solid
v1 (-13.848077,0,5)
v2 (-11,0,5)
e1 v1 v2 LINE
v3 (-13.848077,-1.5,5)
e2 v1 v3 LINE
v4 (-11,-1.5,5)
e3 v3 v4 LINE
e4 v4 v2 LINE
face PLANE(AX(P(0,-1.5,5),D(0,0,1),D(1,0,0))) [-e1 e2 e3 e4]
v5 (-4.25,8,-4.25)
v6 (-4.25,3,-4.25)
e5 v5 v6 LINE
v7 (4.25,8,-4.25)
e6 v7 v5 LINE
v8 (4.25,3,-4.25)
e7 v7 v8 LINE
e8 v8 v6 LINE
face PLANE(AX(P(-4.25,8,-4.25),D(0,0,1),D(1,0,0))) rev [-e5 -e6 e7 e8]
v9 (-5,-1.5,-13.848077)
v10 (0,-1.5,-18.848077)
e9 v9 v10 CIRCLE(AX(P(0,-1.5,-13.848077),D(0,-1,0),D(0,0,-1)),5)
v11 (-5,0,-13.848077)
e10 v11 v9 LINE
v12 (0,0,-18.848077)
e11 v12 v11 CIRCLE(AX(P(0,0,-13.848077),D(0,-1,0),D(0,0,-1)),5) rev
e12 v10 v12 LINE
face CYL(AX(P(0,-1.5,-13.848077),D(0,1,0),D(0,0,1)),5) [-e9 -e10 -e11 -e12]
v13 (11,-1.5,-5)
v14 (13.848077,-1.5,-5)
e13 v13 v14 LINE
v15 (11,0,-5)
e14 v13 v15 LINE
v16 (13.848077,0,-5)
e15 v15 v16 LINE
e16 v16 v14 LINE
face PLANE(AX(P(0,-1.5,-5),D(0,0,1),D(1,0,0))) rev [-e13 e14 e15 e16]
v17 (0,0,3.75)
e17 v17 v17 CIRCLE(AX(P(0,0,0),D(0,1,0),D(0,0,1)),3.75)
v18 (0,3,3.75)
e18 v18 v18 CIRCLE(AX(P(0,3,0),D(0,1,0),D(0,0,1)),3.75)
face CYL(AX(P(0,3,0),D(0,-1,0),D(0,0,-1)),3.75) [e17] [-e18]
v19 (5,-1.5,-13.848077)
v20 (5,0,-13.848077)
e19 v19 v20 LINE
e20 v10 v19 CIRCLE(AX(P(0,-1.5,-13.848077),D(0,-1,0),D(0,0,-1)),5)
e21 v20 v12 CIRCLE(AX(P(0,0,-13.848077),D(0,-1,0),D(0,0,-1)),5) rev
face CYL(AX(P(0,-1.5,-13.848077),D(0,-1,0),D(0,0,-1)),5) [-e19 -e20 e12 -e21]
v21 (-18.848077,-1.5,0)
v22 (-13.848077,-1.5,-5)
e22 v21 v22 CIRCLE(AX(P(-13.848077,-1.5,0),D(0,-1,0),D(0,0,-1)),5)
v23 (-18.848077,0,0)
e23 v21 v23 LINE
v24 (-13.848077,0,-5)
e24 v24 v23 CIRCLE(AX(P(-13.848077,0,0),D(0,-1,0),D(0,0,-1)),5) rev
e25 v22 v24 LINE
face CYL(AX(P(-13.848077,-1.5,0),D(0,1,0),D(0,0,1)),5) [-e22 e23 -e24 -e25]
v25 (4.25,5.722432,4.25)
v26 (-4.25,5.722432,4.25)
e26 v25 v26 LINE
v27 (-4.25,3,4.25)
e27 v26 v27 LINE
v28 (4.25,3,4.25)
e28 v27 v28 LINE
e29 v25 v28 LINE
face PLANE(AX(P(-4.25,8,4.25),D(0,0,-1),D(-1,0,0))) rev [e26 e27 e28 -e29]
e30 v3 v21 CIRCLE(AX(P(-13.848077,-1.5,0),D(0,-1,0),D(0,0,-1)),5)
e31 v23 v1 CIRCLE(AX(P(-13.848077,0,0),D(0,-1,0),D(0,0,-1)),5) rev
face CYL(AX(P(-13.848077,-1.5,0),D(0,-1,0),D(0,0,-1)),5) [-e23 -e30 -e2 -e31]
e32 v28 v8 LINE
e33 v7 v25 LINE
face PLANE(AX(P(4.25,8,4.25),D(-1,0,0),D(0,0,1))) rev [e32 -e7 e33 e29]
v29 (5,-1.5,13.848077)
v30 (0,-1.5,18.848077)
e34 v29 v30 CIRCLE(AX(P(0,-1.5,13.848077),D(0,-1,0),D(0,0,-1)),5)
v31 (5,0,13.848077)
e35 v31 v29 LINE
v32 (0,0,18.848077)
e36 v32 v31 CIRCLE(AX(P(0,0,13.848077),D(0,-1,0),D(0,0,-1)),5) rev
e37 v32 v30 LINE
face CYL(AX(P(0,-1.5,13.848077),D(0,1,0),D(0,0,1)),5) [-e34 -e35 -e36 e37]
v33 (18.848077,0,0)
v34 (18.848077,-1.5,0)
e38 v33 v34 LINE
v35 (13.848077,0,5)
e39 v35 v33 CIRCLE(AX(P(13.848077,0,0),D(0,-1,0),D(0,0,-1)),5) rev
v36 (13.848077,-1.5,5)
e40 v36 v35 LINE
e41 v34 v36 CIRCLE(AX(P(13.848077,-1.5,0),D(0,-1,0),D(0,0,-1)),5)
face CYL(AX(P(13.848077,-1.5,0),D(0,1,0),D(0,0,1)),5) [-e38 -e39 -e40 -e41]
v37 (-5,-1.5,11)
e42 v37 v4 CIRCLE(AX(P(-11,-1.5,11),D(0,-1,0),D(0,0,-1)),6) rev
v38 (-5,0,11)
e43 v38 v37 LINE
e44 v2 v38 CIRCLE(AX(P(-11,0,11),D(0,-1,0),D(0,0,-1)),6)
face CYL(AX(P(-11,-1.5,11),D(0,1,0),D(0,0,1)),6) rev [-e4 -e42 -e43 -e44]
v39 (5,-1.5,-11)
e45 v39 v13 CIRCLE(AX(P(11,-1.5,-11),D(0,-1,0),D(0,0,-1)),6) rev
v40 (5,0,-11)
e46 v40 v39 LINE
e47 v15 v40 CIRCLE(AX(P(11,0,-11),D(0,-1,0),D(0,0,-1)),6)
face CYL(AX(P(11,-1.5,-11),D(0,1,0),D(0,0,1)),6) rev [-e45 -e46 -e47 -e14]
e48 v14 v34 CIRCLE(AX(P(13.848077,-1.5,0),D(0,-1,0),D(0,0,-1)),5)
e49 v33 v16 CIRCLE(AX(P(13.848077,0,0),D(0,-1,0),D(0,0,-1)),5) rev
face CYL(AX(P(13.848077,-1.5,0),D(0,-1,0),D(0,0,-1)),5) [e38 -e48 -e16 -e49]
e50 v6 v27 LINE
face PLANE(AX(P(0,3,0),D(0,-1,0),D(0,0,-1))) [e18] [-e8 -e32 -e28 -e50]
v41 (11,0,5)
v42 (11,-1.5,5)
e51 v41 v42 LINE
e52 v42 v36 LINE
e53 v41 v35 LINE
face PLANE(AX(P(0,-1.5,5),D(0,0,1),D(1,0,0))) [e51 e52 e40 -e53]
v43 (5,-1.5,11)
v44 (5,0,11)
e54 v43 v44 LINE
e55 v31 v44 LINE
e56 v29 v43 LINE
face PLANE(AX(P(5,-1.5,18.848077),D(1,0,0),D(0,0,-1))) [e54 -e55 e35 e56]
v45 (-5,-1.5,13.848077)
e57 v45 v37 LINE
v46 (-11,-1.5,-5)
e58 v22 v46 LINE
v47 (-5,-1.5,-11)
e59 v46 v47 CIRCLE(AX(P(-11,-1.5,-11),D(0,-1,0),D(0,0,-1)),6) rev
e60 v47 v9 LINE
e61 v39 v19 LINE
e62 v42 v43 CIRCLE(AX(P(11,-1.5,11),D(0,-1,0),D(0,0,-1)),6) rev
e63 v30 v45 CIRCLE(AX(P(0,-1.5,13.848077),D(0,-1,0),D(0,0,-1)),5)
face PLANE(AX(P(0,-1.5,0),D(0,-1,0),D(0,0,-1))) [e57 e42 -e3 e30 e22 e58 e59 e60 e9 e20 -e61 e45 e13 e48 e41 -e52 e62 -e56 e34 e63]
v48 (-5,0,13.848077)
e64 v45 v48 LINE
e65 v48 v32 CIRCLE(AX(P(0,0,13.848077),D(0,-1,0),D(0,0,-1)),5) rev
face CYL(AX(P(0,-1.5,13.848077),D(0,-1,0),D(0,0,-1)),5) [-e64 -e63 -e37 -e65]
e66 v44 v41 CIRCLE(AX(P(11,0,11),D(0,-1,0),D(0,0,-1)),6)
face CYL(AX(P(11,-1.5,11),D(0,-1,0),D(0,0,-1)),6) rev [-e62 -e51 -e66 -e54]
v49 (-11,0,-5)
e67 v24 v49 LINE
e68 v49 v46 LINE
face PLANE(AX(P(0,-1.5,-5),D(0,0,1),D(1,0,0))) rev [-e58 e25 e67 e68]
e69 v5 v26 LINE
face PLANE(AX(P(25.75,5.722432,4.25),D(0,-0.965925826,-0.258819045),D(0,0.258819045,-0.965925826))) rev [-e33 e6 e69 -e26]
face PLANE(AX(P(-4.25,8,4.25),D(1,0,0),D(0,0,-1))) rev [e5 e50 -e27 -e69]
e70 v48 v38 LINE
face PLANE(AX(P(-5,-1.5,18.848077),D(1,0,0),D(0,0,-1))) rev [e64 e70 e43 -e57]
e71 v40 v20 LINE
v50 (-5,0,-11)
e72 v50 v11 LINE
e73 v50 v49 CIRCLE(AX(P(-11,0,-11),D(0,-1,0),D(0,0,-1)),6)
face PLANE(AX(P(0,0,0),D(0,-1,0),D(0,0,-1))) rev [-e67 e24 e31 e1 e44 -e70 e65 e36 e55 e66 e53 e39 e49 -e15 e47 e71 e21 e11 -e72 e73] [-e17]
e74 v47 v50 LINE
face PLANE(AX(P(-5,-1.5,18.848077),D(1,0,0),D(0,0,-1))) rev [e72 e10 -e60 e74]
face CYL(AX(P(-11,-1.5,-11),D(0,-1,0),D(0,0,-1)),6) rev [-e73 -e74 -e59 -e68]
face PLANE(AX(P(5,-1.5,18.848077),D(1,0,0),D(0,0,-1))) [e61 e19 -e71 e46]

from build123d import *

# Parameters (mm, degrees)
SKETCH1_R           = 3.75
BOSS_EXTRUDE1_DEPTH = 3
SKETCH5_W           = 8.5
SKETCH5_H           = 8.5
BOSS_EXTRUDE3_DEPTH = 5
CUT_EXTRUDE4_DEPTH  = 30
SKETCH2_W           = 10
SKETCH2_H           = 37.69615365
SKETCH2_W_2         = 37.69615365
SKETCH2_H_2         = 10
BOSS_EXTRUDE4_DEPTH = 1.5
FILLET1_R           = 5
FILLET2_R           = 6


with BuildPart() as part:
    # Sketch1 → Boss-Extrude1 (new body)
    with BuildSketch(Plane(origin=(0, 0, 0), x_dir=(1, 0, 0), z_dir=(0, 1, 0))):
        with Locations(Location((0, 0, 0), (0, 0, 270))):
            Circle(SKETCH1_R)
    extrude(amount=BOSS_EXTRUDE1_DEPTH)

    # Sketch5 → Boss-Extrude3 (add)
    with BuildSketch(Plane(origin=(0, 3, 0), x_dir=(1, 0, 0), z_dir=(0, 1, 0))):
        Rectangle(SKETCH5_W, SKETCH5_H)
    extrude(amount=BOSS_EXTRUDE3_DEPTH)

    # Sketch19 → Cut-Extrude4 (cut)
    with BuildSketch(Plane.ZY.offset(4.25)):
        Polygon((-4.25, 8), (4.25, 8), (4.25, 5.722431864), align=None)
    extrude(amount=-CUT_EXTRUDE4_DEPTH, mode=Mode.SUBTRACT)

    # Sketch2 → Boss-Extrude4 (add)
    with BuildSketch(Plane.XZ):
        Rectangle(SKETCH2_W, SKETCH2_H)
        Rectangle(SKETCH2_W_2, SKETCH2_H_2)
    extrude(amount=BOSS_EXTRUDE4_DEPTH)

    # Fillet1
    fillet1_edges = [part.edges().sort_by_distance(p)[0] for p in [
        (18.848076825, -0.75, -5),
        (5, -0.75, -18.848076825),
        (-5, -0.75, -18.848076825),
        (-18.848076825, -0.75, -5),
        (-18.848076825, -0.75, 5),
        (18.848076825, -0.75, 5),
        (5, -0.75, 18.848076825),
        (-5, -0.75, 18.848076825),
    ]]
    fillet(fillet1_edges, radius=FILLET1_R - 0.0001)  # a hair under: the kernel refuses the full size

    # Fillet2
    fillet2_edges = [part.edges().sort_by_distance(p)[0] for p in [
        (5, -0.75, -5),
        (-5, -0.75, 5),
        (-5, -0.75, -5),
        (5, -0.75, 5),
    ]]
    fillet(fillet2_edges, radius=FILLET2_R)


solid = part.part
